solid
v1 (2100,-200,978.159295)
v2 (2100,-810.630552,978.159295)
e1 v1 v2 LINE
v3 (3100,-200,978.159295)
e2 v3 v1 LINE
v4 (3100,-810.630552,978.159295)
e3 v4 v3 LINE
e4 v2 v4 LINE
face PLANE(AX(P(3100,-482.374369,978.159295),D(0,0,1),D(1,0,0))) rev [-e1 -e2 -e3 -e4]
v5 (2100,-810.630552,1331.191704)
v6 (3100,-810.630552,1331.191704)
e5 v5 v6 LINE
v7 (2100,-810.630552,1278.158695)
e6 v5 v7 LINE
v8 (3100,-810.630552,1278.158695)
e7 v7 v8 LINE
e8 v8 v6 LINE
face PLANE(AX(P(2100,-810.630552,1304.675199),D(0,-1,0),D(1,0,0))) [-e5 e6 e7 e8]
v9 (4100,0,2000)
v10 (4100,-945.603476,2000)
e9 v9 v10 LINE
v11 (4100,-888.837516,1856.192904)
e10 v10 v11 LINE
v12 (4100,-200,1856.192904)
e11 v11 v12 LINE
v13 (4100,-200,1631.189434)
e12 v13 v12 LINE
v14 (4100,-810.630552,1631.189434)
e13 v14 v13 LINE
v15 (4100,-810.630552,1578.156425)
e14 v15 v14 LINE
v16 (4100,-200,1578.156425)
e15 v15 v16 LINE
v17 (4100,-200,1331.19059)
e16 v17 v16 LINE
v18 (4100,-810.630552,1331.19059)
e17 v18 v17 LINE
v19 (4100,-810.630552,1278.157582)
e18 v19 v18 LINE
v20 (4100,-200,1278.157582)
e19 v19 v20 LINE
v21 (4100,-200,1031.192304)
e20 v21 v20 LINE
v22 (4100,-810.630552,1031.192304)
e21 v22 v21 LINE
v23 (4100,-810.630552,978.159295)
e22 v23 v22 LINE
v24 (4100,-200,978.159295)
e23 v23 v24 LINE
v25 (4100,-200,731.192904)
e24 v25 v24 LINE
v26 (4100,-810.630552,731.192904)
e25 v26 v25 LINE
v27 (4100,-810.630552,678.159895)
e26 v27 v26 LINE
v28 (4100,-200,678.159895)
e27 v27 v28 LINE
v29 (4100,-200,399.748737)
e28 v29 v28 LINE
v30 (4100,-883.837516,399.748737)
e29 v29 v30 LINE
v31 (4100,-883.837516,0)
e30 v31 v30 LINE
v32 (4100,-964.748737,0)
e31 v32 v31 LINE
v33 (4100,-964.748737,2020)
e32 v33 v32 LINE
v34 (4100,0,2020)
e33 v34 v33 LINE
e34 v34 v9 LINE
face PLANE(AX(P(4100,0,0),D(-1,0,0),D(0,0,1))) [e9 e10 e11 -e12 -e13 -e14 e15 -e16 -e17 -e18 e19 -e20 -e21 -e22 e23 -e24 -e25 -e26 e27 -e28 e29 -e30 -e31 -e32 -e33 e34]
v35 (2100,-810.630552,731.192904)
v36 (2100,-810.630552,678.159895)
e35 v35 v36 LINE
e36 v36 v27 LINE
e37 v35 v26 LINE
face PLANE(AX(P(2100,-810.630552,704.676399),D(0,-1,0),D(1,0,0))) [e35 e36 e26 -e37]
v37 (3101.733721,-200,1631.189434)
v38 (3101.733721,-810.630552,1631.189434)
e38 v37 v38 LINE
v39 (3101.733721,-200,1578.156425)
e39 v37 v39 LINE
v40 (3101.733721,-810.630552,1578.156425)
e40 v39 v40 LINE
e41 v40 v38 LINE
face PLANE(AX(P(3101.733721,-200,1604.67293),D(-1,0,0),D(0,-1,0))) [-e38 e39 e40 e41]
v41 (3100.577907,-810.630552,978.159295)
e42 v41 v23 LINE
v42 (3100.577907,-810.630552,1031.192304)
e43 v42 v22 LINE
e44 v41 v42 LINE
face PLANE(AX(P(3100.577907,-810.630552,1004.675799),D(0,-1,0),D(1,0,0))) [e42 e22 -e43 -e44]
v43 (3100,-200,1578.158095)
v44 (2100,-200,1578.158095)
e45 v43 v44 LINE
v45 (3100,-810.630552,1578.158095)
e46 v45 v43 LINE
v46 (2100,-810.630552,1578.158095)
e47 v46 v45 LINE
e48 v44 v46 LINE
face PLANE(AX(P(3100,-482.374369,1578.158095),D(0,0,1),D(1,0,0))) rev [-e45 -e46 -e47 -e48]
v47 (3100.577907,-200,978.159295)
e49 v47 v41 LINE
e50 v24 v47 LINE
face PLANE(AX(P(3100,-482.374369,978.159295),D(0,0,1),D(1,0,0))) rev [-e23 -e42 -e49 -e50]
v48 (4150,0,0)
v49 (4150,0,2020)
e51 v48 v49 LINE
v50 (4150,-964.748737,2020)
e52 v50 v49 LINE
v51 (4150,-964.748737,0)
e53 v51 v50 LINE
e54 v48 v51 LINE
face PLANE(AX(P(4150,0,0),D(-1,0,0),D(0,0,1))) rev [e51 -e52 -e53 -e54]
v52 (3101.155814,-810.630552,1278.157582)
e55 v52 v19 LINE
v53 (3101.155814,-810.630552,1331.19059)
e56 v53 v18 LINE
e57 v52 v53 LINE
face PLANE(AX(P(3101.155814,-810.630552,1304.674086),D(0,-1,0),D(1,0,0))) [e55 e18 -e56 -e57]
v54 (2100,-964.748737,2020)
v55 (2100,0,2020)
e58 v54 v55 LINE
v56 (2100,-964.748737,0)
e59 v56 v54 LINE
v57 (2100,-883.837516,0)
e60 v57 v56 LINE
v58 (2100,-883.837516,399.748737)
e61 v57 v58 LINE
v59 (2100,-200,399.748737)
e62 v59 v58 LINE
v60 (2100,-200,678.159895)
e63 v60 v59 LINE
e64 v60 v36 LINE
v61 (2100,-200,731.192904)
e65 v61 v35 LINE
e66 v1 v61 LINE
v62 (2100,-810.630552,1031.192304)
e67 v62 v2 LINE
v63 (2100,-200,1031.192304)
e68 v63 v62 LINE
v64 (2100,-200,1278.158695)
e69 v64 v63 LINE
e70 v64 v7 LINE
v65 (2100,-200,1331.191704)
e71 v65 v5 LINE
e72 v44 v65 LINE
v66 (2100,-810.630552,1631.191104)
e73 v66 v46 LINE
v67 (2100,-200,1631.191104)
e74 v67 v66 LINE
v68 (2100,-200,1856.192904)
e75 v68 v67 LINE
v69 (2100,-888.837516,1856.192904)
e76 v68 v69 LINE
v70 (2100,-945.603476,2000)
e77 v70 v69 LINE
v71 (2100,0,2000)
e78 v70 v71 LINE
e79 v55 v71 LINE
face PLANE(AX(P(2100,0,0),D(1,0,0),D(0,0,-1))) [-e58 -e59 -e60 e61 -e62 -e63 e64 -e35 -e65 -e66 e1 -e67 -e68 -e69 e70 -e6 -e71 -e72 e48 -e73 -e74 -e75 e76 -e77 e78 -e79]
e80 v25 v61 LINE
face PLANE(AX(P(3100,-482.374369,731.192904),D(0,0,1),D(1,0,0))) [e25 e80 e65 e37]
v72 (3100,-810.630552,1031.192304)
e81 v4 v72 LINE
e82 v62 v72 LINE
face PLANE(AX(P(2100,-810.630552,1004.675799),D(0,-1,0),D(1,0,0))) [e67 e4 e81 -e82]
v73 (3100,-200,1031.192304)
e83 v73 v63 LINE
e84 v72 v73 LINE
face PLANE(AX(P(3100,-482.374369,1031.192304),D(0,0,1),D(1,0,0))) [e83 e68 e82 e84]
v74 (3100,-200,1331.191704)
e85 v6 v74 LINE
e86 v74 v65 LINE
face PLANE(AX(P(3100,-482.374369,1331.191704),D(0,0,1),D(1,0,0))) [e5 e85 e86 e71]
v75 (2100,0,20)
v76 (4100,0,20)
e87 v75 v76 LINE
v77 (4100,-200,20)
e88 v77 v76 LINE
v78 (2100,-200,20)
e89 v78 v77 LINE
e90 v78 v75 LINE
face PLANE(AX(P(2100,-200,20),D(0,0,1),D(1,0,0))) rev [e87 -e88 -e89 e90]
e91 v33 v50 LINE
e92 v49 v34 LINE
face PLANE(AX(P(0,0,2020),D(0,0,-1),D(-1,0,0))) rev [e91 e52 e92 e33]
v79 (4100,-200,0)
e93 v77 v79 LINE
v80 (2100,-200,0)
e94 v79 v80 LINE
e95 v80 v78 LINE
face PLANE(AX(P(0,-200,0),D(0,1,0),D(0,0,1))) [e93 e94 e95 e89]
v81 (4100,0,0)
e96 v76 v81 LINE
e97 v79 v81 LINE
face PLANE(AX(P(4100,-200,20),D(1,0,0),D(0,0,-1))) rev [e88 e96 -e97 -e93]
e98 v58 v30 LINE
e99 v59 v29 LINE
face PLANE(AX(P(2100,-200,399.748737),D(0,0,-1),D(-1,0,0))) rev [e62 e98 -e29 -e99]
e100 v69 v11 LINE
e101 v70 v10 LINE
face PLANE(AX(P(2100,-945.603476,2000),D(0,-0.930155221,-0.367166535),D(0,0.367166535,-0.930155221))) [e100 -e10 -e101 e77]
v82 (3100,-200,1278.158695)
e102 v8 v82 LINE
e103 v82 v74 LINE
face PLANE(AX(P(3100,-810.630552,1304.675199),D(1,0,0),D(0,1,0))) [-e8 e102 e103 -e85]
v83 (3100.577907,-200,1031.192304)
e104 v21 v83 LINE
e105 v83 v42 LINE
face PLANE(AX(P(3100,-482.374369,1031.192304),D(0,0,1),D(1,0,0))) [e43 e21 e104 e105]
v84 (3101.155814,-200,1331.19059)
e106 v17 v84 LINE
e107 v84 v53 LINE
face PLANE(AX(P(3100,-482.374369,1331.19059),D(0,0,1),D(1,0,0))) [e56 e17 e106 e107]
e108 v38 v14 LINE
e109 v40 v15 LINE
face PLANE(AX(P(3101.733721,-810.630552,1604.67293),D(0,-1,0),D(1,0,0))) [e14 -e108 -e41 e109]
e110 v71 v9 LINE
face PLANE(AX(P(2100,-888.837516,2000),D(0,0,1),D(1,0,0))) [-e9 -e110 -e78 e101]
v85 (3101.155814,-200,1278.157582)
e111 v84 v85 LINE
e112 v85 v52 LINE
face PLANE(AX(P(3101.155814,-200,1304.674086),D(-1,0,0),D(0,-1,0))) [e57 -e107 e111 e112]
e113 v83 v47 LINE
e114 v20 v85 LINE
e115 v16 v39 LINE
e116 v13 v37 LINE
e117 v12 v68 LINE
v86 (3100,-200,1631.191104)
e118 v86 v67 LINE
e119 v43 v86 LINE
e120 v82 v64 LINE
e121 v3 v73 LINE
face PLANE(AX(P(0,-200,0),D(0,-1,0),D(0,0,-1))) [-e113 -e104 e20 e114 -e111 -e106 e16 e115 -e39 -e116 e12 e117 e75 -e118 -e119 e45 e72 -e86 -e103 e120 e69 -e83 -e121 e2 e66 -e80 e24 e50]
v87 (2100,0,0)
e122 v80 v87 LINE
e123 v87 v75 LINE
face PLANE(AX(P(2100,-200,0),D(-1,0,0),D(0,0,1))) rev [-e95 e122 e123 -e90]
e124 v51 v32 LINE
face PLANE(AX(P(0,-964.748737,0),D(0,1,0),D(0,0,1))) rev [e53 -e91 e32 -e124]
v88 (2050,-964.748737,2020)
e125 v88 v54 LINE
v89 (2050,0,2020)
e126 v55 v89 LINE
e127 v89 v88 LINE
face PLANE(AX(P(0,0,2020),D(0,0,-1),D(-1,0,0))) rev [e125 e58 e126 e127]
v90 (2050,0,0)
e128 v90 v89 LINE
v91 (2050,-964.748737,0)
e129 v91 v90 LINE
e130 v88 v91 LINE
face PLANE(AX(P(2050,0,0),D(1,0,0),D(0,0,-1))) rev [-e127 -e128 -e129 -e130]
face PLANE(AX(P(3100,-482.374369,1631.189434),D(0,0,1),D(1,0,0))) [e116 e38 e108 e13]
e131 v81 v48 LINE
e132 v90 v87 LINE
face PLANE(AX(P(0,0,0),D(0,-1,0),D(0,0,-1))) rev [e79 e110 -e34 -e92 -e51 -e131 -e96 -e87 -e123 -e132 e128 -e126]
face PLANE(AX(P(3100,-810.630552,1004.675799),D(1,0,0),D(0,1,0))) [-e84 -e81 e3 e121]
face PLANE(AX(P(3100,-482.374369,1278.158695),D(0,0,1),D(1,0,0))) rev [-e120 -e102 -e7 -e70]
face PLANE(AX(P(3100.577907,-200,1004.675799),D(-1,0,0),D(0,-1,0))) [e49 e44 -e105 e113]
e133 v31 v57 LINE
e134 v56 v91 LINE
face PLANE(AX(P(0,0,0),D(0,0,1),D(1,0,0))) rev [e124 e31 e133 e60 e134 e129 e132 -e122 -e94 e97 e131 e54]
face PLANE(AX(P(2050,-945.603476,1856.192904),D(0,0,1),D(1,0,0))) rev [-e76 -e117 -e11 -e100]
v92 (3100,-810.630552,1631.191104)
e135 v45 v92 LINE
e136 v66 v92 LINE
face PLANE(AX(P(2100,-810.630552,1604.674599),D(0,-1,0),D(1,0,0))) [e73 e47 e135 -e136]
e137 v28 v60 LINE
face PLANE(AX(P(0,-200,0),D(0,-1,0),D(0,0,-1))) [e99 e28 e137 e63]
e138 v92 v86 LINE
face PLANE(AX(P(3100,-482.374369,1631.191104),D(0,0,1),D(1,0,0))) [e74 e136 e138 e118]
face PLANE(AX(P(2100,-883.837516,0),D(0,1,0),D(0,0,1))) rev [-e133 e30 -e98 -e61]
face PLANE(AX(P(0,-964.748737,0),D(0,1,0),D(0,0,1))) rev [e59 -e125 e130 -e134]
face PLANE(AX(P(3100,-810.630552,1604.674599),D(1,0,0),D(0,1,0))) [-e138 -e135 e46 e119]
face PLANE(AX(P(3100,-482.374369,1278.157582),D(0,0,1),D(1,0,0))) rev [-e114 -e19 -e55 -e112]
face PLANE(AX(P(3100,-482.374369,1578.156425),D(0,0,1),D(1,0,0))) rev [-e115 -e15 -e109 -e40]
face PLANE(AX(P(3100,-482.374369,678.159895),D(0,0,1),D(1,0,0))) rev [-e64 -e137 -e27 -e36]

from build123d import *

# Parameters (mm, degrees)
BOSS_EXTRUDE1_DEPTH = 2000
SKETCH2_W           = 143.807096291
SKETCH2_H           = 56.765959062
BOSS_EXTRUDE2_DEPTH = 50
SKETCH3_W           = 50
SKETCH3_H           = 143.807096291
BOSS_EXTRUDE3_DEPTH = 19.145261779
SKETCH4_W           = 2050
SKETCH4_H           = 143.807096291
BOSS_EXTRUDE4_DEPTH = 888.8375165
SKETCH5_W           = 143.807096291
SKETCH5_H           = 945.603475562
BOSS_EXTRUDE5_DEPTH = 50
SKETCH6_W           = 50
SKETCH6_H           = 143.807096291
BOSS_EXTRUDE6_DEPTH = 19.145261779
BOSS_EXTRUDE7_DEPTH = 1856.192903709
SKETCH8_W           = 50
SKETCH8_H           = 964.748737342
BOSS_EXTRUDE8_DEPTH = 20
SKETCH9_W           = 50
SKETCH9_H           = 964.748737342
BOSS_EXTRUDE9_DEPTH = 20
SKETCH10_W          = 2000
SKETCH10_H          = 1456.444166367
CUT_EXTRUDE1_DEPTH  = 683.8375165
SKETCH11_W          = 2000
SKETCH11_H          = 20
CUT_EXTRUDE2_DEPTH  = 200
RIB1_REACH          = 4461.071
SKETCH12_WALL_W     = 10920.142474856
SKETCH12_WALL_H     = 53.033008588
RIB2_START          = -26.516504294
RIB2_OUTLINE_W      = 998.266278858
RIB2_OUTLINE_H      = 610.630552395
RIB2_DEPTH          = 53.033008588
RIB3_START          = -26.516504294
RIB3_OUTLINE_W      = 1000
RIB3_OUTLINE_H      = 610.630552395
RIB3_DEPTH          = 53.033008589
RIB4_START          = -26.516504294
RIB4_OUTLINE_W      = 998.844185905
RIB4_OUTLINE_H      = 610.630552395
RIB4_DEPTH          = 53.033008588
RIB5_START          = -26.516504294
RIB5_OUTLINE_W      = 1000
RIB5_OUTLINE_H      = 610.630552395
RIB5_DEPTH          = 53.033008588
RIB6_START          = -26.516504294
RIB6_OUTLINE_W      = 999.422092953
RIB6_OUTLINE_H      = 610.630552395
RIB6_DEPTH          = 53.033008588
RIB7_START          = -26.516504294
RIB7_OUTLINE_W      = 1000
RIB7_OUTLINE_H      = 610.630552395
RIB7_DEPTH          = 53.033008588


# Read off the part's stored shape, not the designer's step: Rib2, Rib3, Rib4, Rib5, Rib6, Rib7
with BuildPart() as part:
    # Sketch1 → Boss-Extrude1 (new body)
    with BuildSketch(Plane(origin=(4100, 0, 0), x_dir=(0, 0, -1), z_dir=(1, 0, 0))):
        Polygon((-1856.192903709, -888.8375165), (-2000, -888.8375165), (-2000, -945.603475562), align=None)
    extrude(amount=-BOSS_EXTRUDE1_DEPTH)

    # Sketch2 → Boss-Extrude2 (add)
    with BuildSketch(Plane.ZY.offset(-2100)):
        with Locations((1928.096451855, -917.220496031)):
            Rectangle(SKETCH2_W, SKETCH2_H)
    extrude(amount=BOSS_EXTRUDE2_DEPTH)

    # Sketch3 → Boss-Extrude3 (add)
    with BuildSketch(Plane.XZ.offset(945.603475562)):
        with Locations((2075, 1928.096451855)):
            Rectangle(SKETCH3_W, SKETCH3_H)
    extrude(amount=BOSS_EXTRUDE3_DEPTH)

    # Sketch4 → Boss-Extrude4 (add)
    with BuildSketch(Plane(origin=(0, -888.8375165, 0), x_dir=(-1, 0, 0), z_dir=(0, 1, 0))):
        with Locations((-3075, 1928.096451855)):
            Rectangle(SKETCH4_W, SKETCH4_H)
    extrude(amount=BOSS_EXTRUDE4_DEPTH)

    # Sketch5 → Boss-Extrude5 (add)
    with BuildSketch(Plane(origin=(4100, 0, 0), x_dir=(0, 0, -1), z_dir=(1, 0, 0))):
        with Locations((-1928.096451855, -472.801737781)):
            Rectangle(SKETCH5_W, SKETCH5_H)
    extrude(amount=BOSS_EXTRUDE5_DEPTH)

    # Sketch6 → Boss-Extrude6 (add)
    with BuildSketch(Plane.XZ.offset(945.603475562)):
        with Locations((4125, 1928.096451855)):
            Rectangle(SKETCH6_W, SKETCH6_H)
    extrude(amount=BOSS_EXTRUDE6_DEPTH)

    # Sketch7 → Boss-Extrude7 (add)
    with BuildSketch(Plane(origin=(0, 0, 1856.192903709), x_dir=(-1, 0, 0), z_dir=(0, 0, -1))):
        Polygon((-2050, 0), (-2050, -964.748737342), (-2100, -964.748737342), (-2100, -883.8375165), (-4100, -883.8375165), (-4100, -964.748737342), (-4150, -964.748737342), (-4150, 0), align=None)
    extrude(amount=BOSS_EXTRUDE7_DEPTH)

    # Sketch8 → Boss-Extrude8 (add)
    with BuildSketch(Plane.XY.offset(2000)):
        with Locations((2075, -482.374368671)):
            Rectangle(SKETCH8_W, SKETCH8_H)
    extrude(amount=BOSS_EXTRUDE8_DEPTH)

    # Sketch9 → Boss-Extrude9 (add)
    with BuildSketch(Plane.XY.offset(2000)):
        with Locations((4125, -482.374368671)):
            Rectangle(SKETCH9_W, SKETCH9_H)
    extrude(amount=BOSS_EXTRUDE9_DEPTH)

    # Sketch10 → Cut-Extrude1 (cut)
    with BuildSketch(Plane.XZ.offset(883.8375165)):
        with Locations((3100, 1127.970820526)):
            Rectangle(SKETCH10_W, SKETCH10_H)
    extrude(amount=-CUT_EXTRUDE1_DEPTH, mode=Mode.SUBTRACT)

    # Sketch11 → Cut-Extrude2 (cut)
    with BuildSketch(Plane(origin=(0, 0, 0), x_dir=(-1, 0, 0), z_dir=(0, 1, 0))):
        with Locations((-3100, 10)):
            Rectangle(SKETCH11_W, SKETCH11_H)
    extrude(amount=-CUT_EXTRUDE2_DEPTH, mode=Mode.SUBTRACT)

    # Sketch12 wall → Rib1 (add, up to next)
    with BuildSketch(Plane(origin=(3100, -810.630552395, 704.676399414), x_dir=(1, 0, 0), z_dir=(0, 1, 0)), mode=Mode.PRIVATE) as rib1_sk1:
        Rectangle(SKETCH12_WALL_W, SKETCH12_WALL_H)
    rib1_tool1 = extrude(rib1_sk1.sketch, amount=RIB1_REACH, mode=Mode.PRIVATE) - part.part
    add(rib1_tool1.solids().sort_by_distance((3100, -810.630552395, 704.676399414))[0])

    # Rib2 outline → Rib2 (add)
    with BuildSketch(Plane.XY.offset(1604.672929526).offset(RIB2_START)):
        with Locations((3600.866860571, -505.315276197)):
            Rectangle(RIB2_OUTLINE_W, RIB2_OUTLINE_H)
    extrude(amount=RIB2_DEPTH)

    # Rib3 outline → Rib3 (add)
    with BuildSketch(Plane.XY.offset(1604.674599414).offset(RIB3_START)):
        with Locations((2600, -505.315276197)):
            Rectangle(RIB3_OUTLINE_W, RIB3_OUTLINE_H)
    extrude(amount=RIB3_DEPTH)

    # Rib4 outline → Rib4 (add)
    with BuildSketch(Plane.XY.offset(1304.674086156).offset(RIB4_START)):
        with Locations((3600.577907048, -505.315276197)):
            Rectangle(RIB4_OUTLINE_W, RIB4_OUTLINE_H)
    extrude(amount=RIB4_DEPTH)

    # Rib5 outline → Rib5 (add)
    with BuildSketch(Plane.XY.offset(1004.675799414).offset(RIB5_START)):
        with Locations((2600, -505.315276197)):
            Rectangle(RIB5_OUTLINE_W, RIB5_OUTLINE_H)
    extrude(amount=RIB5_DEPTH)

    # Rib6 outline → Rib6 (add)
    with BuildSketch(Plane.XY.offset(1004.675799414).offset(RIB6_START)):
        with Locations((3600.288953523, -505.315276197)):
            Rectangle(RIB6_OUTLINE_W, RIB6_OUTLINE_H)
    extrude(amount=RIB6_DEPTH)

    # Rib7 outline → Rib7 (add)
    with BuildSketch(Plane.XY.offset(1304.675199414).offset(RIB7_START)):
        with Locations((2600, -505.315276197)):
            Rectangle(RIB7_OUTLINE_W, RIB7_OUTLINE_H)
    extrude(amount=RIB7_DEPTH)


solid = part.part
